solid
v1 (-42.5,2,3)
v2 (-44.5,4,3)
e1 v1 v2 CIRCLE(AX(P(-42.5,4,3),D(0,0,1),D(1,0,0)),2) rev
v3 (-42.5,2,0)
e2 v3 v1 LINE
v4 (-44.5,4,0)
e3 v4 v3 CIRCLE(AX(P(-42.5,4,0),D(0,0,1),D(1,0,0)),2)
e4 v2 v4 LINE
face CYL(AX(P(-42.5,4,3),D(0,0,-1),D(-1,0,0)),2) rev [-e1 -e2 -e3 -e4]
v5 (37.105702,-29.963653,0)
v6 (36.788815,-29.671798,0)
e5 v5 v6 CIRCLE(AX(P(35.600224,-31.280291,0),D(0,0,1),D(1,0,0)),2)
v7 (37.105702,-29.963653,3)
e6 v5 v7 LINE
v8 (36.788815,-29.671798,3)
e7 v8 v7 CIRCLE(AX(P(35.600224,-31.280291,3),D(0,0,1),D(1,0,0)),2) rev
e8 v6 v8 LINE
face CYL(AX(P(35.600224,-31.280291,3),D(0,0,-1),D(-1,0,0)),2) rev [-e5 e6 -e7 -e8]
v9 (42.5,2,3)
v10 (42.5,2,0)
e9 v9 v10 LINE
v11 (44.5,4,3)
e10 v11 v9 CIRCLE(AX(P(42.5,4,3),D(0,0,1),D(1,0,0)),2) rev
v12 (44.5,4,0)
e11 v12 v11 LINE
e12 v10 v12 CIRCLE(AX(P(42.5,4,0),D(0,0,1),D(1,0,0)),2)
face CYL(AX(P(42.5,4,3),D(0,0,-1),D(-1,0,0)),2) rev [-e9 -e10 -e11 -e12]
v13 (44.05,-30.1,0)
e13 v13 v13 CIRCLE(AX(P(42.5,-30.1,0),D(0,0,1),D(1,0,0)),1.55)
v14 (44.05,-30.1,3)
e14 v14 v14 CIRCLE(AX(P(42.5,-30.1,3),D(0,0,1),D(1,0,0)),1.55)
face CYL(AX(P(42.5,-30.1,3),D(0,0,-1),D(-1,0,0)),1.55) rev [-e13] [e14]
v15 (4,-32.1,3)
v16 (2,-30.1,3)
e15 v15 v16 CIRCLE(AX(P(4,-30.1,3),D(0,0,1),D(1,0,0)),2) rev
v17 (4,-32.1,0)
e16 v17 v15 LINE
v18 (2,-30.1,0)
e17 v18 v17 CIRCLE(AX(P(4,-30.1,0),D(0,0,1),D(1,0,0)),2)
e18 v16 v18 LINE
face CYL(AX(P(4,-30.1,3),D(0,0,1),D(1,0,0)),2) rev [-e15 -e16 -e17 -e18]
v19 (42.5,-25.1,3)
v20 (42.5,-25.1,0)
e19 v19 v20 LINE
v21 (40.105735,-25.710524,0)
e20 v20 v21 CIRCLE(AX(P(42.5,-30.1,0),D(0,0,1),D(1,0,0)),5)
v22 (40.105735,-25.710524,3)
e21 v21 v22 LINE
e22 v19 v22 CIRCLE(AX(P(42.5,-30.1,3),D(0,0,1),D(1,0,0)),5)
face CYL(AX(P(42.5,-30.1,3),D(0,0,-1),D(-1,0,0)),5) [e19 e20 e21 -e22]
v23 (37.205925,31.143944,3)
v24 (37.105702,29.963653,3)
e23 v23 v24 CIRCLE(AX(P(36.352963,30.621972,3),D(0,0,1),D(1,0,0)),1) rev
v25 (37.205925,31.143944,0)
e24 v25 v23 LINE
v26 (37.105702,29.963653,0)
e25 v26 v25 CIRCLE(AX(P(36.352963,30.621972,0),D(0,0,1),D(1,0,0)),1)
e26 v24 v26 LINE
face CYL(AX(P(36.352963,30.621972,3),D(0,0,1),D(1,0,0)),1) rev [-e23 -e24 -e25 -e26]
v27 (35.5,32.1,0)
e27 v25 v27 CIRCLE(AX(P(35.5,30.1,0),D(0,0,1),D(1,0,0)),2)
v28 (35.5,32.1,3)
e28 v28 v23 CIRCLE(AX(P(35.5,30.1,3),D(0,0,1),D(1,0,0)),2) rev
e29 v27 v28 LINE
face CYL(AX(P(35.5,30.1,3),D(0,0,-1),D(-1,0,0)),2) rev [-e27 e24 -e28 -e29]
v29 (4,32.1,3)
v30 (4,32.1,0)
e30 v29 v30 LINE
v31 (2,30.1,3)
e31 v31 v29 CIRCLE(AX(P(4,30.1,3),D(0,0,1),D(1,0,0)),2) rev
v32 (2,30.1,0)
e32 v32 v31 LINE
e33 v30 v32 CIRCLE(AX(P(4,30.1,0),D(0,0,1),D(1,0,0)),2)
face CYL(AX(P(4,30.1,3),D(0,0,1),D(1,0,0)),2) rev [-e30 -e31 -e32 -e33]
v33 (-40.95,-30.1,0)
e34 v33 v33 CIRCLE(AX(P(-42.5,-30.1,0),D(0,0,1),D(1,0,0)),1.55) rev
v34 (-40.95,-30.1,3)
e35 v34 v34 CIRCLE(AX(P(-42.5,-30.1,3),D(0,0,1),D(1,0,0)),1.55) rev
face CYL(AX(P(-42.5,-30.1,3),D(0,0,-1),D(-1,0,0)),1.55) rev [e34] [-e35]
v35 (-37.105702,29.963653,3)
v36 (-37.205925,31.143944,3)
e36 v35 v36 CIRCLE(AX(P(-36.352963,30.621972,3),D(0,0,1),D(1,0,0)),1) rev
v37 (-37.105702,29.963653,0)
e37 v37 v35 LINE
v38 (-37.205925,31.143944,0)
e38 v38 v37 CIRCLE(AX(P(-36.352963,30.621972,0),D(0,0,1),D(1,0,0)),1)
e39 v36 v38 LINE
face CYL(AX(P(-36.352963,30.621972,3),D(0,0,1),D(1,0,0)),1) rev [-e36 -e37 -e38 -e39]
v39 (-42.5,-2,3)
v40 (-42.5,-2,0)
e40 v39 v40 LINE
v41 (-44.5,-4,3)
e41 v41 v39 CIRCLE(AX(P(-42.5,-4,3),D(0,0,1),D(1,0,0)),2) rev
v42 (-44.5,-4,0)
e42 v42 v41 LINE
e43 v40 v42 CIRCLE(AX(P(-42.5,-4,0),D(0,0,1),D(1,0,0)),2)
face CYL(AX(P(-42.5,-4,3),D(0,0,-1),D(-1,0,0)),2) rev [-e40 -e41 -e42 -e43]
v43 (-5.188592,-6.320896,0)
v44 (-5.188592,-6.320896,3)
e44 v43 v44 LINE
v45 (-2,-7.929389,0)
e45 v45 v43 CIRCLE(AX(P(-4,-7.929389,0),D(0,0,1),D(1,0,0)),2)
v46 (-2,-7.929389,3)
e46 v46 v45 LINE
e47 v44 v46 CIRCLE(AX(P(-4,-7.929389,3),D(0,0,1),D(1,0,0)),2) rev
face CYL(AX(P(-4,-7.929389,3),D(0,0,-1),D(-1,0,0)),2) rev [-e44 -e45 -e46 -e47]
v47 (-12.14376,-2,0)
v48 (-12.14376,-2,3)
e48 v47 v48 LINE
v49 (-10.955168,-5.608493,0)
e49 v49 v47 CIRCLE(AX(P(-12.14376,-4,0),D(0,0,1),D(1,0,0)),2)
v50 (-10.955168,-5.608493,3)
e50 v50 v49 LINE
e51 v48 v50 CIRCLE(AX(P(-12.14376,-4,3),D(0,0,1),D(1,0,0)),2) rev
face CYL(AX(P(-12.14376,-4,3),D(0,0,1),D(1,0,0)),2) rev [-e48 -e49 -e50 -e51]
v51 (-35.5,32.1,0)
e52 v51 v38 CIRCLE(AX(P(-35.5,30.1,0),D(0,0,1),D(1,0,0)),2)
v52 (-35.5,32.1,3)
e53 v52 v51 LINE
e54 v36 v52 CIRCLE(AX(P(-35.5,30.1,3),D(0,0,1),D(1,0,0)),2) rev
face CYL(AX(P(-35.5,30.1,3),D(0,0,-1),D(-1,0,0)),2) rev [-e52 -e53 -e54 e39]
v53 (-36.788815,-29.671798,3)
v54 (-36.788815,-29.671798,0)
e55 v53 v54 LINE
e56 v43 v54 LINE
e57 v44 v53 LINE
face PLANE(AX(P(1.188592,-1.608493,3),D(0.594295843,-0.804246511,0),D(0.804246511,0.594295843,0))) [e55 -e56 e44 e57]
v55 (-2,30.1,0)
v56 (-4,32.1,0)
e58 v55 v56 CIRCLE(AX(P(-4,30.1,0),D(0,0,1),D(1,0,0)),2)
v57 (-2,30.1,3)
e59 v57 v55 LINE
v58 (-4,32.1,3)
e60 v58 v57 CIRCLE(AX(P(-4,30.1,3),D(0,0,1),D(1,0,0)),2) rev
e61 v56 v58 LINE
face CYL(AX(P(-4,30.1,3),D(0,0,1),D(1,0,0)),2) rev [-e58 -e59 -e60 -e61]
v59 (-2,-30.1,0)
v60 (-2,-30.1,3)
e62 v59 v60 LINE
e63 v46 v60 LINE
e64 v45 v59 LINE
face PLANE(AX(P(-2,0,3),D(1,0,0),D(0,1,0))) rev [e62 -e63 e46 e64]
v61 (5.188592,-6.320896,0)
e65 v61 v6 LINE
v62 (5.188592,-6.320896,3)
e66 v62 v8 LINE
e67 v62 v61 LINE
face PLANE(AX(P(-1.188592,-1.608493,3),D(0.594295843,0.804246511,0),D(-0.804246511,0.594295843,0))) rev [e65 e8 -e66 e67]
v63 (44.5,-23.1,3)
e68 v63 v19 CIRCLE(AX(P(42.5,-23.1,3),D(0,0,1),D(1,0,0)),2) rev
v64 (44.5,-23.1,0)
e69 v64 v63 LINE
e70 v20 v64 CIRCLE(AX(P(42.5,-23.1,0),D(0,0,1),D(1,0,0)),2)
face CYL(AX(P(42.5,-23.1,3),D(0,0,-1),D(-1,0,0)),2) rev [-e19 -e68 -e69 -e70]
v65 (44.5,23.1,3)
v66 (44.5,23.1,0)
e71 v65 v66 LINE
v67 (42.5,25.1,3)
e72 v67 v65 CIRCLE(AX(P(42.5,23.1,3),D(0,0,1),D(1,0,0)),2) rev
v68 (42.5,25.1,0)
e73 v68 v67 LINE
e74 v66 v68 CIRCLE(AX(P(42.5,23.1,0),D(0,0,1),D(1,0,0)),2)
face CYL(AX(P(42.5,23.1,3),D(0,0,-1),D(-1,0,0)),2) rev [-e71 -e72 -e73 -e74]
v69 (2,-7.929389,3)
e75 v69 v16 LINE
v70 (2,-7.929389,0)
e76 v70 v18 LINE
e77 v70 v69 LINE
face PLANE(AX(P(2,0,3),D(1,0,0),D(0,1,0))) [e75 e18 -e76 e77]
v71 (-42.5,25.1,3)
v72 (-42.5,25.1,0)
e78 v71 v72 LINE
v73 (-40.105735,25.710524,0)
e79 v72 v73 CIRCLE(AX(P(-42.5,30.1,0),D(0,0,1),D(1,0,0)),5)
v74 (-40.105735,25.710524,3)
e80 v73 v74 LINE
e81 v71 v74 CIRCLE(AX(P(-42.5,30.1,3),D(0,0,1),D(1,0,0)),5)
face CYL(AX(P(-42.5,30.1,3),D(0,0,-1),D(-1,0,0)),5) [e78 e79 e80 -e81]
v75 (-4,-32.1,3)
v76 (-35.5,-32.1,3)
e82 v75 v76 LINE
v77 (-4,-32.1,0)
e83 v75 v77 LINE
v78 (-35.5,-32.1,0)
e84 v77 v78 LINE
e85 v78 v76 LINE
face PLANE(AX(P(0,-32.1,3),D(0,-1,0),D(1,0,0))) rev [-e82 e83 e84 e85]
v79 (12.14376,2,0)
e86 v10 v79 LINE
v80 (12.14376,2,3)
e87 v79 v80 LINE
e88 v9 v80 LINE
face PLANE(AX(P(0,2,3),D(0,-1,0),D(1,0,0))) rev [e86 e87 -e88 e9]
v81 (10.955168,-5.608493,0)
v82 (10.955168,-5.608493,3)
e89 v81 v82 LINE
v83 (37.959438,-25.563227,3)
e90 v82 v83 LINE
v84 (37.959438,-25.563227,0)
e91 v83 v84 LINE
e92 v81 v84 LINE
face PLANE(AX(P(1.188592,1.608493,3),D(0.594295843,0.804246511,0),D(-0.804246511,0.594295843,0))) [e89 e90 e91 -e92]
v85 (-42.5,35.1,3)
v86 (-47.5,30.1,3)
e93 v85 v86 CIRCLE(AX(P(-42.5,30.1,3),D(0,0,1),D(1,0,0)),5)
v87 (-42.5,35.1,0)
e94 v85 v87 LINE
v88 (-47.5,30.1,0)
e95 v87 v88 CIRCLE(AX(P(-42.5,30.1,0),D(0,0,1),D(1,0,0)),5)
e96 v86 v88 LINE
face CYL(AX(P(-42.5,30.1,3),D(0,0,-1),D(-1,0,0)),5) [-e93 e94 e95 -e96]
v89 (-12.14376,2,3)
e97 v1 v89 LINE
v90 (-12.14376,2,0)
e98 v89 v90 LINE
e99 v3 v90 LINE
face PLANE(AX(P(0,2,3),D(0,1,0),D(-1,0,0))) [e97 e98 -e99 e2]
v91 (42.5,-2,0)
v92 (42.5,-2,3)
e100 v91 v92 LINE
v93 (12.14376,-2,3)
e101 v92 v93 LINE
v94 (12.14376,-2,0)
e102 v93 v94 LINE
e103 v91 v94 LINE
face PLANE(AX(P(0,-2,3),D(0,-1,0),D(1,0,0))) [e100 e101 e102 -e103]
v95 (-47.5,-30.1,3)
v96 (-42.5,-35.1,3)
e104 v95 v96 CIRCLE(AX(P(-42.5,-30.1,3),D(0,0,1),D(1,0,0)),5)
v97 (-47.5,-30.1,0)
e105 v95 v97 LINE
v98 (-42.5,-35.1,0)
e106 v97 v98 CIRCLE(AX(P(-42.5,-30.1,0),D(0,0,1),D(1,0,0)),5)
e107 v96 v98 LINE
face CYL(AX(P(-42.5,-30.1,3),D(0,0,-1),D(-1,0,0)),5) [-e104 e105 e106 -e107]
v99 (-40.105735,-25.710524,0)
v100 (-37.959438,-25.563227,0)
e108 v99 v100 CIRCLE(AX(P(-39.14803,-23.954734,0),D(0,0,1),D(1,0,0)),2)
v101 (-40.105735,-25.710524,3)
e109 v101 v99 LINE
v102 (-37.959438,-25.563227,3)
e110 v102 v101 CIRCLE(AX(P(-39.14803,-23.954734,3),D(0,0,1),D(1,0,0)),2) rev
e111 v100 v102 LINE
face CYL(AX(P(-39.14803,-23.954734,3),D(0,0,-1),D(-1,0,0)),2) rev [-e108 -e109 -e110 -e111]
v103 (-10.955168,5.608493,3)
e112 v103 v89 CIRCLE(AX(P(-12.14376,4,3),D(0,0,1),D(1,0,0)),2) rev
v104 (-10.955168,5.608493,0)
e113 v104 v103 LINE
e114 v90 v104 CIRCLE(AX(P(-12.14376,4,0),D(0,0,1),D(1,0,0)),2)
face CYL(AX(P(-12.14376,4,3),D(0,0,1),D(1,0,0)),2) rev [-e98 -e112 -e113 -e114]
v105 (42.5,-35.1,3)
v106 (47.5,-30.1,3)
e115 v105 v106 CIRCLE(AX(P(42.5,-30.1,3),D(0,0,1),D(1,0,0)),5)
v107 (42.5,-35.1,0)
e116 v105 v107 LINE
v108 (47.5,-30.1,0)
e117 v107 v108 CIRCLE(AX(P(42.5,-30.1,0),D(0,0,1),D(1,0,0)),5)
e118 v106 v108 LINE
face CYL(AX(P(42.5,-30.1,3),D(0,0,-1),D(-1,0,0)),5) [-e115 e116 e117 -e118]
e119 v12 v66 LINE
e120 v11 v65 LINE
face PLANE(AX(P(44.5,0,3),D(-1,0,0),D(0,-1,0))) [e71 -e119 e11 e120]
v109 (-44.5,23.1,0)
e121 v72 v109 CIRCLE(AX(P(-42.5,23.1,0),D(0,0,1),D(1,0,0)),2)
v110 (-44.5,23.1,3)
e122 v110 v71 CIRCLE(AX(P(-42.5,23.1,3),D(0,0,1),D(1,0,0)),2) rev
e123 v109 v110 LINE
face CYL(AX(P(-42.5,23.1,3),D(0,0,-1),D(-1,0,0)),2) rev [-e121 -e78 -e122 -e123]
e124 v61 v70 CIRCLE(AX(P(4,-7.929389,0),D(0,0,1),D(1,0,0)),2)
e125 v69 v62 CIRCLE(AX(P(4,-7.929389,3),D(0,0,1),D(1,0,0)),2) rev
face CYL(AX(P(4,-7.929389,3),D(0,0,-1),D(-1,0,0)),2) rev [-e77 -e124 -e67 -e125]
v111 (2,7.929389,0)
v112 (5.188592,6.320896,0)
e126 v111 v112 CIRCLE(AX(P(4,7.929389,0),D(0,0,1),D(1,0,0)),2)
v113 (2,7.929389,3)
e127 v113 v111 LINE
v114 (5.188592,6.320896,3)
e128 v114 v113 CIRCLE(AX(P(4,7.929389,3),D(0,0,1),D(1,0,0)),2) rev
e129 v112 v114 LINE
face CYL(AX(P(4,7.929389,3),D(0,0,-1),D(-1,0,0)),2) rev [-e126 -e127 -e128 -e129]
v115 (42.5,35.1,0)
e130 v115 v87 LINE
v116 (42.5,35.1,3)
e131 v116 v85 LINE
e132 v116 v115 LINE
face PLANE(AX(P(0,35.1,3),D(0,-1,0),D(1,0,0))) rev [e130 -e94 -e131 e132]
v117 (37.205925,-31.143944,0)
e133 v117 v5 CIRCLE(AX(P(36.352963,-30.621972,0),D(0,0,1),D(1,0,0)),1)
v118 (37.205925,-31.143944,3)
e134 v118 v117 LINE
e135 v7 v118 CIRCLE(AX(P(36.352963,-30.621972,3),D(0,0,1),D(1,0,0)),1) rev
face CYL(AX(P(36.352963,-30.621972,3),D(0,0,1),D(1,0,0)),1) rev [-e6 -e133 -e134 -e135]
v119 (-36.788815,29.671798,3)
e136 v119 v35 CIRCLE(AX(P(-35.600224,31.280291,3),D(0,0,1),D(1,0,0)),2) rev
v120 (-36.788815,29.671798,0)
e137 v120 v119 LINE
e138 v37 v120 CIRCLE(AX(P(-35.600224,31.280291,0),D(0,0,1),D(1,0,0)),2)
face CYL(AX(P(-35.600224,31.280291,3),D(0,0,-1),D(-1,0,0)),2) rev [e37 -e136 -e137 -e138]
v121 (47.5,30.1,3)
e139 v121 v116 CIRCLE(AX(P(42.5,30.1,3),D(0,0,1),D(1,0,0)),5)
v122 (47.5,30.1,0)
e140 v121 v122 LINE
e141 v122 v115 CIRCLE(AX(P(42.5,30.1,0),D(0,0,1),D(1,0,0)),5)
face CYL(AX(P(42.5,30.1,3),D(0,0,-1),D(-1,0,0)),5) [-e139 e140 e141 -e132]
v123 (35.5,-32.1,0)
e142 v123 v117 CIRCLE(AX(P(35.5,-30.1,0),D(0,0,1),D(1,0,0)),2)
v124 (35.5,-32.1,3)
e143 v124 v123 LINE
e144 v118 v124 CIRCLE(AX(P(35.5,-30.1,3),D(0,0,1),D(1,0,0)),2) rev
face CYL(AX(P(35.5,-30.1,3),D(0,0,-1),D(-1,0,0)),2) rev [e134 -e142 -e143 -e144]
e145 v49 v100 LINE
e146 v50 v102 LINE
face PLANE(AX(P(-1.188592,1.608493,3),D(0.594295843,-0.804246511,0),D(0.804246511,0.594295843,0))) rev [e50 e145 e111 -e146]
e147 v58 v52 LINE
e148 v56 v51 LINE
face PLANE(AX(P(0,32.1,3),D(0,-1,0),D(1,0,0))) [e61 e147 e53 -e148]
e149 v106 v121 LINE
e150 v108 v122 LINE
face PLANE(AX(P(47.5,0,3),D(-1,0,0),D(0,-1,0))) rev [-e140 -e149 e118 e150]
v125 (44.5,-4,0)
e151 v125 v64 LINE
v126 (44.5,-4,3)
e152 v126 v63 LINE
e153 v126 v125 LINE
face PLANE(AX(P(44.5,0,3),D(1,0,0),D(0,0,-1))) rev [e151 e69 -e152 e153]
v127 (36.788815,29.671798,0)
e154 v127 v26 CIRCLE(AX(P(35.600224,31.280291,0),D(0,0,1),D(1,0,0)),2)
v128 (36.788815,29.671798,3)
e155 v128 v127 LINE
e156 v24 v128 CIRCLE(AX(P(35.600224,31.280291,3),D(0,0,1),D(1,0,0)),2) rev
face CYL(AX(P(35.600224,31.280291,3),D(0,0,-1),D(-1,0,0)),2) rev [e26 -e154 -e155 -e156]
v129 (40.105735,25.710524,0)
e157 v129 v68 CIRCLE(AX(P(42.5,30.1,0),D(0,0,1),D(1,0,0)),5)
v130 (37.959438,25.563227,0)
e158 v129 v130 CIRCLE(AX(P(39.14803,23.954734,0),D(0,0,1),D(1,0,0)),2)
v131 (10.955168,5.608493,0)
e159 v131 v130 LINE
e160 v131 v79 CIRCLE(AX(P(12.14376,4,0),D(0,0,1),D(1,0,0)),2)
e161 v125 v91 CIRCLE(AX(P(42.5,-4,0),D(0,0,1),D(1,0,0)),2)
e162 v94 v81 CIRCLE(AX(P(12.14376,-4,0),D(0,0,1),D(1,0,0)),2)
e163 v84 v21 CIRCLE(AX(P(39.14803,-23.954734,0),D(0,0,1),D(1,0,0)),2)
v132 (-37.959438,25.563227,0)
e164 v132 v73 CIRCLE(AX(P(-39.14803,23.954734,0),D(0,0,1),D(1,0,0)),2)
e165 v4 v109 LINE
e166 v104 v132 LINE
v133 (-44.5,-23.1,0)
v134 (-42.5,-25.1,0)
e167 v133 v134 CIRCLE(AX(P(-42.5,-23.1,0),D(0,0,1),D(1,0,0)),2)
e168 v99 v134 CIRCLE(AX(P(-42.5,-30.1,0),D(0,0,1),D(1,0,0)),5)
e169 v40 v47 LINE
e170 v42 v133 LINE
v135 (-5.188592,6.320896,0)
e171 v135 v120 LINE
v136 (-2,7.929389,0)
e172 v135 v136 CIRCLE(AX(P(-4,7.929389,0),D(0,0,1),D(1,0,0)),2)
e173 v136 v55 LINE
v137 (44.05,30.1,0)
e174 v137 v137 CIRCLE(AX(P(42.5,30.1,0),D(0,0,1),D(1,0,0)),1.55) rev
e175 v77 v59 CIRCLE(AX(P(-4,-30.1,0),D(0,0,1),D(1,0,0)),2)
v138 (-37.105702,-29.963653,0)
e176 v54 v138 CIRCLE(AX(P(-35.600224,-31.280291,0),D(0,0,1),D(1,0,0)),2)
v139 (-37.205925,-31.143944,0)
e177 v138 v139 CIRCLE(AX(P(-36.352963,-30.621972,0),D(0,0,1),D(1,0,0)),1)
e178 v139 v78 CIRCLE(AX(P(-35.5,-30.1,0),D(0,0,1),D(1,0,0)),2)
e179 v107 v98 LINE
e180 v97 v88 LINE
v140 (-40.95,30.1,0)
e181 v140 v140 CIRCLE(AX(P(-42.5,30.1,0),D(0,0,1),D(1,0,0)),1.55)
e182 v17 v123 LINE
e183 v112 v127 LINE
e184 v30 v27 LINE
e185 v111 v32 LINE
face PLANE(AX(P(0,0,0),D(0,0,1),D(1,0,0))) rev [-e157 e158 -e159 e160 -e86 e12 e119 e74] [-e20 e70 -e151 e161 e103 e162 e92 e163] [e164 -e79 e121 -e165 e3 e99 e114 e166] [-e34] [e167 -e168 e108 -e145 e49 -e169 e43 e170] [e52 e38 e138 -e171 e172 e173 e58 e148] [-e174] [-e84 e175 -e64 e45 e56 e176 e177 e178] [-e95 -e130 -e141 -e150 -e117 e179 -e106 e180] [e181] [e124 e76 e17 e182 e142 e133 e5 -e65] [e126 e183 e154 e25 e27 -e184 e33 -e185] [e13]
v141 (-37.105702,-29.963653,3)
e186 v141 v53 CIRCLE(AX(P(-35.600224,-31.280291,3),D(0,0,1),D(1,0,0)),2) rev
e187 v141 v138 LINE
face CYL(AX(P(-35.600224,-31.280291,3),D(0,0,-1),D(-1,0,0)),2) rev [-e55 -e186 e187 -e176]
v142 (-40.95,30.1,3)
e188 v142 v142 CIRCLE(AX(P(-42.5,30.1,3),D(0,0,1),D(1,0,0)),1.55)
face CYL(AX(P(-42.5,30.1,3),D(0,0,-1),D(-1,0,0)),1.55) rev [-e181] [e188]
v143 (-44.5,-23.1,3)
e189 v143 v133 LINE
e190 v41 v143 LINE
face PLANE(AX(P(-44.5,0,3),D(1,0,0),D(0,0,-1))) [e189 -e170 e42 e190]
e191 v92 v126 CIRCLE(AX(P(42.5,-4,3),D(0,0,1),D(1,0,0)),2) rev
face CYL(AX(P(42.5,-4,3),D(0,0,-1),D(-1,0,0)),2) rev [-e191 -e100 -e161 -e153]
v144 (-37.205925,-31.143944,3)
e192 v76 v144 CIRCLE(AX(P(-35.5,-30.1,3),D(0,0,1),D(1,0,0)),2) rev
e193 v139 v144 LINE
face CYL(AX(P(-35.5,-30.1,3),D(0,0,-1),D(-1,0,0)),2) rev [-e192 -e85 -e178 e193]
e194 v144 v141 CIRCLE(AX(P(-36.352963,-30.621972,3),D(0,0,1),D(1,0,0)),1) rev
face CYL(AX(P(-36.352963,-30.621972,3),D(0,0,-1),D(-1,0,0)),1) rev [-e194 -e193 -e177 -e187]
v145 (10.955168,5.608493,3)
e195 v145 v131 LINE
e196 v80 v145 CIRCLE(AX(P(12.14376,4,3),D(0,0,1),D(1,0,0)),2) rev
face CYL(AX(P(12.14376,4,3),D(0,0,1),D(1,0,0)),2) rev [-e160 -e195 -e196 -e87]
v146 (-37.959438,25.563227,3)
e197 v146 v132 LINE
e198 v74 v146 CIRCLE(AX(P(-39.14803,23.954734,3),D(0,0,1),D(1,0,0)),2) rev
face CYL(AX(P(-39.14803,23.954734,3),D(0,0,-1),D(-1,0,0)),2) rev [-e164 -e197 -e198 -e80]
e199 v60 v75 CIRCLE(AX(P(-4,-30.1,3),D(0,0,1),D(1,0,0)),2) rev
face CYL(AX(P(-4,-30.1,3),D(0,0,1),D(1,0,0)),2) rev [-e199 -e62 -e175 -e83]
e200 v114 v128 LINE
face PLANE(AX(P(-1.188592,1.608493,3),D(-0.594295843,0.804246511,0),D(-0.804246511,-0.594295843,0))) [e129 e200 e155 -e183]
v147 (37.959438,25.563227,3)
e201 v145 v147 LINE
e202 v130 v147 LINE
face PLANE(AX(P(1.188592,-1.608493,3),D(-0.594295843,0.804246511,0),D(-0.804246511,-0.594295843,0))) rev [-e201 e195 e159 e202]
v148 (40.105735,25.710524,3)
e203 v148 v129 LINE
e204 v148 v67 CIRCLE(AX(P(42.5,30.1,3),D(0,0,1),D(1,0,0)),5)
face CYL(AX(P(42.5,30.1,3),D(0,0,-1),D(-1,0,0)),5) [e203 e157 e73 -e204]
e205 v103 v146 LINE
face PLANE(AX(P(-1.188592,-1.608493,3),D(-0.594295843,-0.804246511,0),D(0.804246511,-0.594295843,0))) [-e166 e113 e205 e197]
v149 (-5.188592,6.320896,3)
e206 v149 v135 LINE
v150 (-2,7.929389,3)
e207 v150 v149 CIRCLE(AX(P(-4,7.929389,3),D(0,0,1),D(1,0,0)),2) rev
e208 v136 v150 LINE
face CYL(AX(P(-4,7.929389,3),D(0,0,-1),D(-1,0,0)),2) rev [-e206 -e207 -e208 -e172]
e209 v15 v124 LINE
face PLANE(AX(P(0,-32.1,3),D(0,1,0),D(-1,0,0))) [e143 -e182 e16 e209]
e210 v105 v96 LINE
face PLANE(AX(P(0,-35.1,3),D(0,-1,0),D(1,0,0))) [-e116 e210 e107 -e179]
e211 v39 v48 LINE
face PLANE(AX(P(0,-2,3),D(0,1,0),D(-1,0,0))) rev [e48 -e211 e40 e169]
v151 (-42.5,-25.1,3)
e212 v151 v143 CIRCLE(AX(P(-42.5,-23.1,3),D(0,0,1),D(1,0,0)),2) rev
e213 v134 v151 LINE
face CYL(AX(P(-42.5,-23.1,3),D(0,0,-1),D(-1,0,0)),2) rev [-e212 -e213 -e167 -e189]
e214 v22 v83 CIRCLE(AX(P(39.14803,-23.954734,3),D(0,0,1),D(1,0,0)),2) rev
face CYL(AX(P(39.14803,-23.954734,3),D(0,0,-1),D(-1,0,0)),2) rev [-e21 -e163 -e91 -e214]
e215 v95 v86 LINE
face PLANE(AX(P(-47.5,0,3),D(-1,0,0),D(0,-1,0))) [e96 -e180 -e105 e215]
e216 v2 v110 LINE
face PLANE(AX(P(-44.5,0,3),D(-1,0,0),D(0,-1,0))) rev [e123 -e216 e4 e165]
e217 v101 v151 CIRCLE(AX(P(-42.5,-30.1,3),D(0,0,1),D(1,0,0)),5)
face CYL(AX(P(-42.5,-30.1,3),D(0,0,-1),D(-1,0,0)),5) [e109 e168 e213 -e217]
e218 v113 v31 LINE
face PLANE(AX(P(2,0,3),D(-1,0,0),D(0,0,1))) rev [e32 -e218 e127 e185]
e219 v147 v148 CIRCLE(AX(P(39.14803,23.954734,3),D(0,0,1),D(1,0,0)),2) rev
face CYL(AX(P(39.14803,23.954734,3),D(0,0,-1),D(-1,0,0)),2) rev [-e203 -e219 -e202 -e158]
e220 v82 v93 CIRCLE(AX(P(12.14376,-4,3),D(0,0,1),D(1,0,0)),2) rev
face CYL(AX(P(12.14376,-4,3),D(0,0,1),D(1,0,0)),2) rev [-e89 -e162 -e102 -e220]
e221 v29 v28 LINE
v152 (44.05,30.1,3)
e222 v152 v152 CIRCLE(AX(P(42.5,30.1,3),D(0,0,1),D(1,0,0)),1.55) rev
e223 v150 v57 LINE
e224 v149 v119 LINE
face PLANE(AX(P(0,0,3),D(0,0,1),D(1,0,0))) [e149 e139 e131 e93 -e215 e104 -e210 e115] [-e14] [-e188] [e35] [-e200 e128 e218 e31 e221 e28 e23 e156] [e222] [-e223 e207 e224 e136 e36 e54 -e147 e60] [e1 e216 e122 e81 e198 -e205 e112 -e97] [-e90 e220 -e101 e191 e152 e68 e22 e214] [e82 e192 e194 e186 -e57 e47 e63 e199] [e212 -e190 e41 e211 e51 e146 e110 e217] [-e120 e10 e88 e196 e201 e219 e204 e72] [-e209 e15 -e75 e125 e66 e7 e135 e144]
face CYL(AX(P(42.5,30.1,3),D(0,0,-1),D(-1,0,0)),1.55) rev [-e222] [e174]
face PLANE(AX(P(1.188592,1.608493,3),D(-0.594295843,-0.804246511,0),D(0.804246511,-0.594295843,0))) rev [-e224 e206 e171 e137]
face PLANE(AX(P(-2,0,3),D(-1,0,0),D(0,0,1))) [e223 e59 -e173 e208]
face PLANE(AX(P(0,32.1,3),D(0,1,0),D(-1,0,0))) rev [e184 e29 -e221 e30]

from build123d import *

# Parameters (mm, degrees)
SKETCH_1_R      = 5
SKETCH_1_R_2    = 1.55
EXTRUDE_1_DEPTH = 3
FILLET_1_R      = 2
FILLET_2_R      = 1


with BuildPart() as part:
    # 草图1 → 凸台-拉伸1 (new body)
    # profile 1 of 5: a face of its own
    with BuildSketch(Plane.XY):
        with BuildLine():
            Line((-42.5, -35.1), (42.5, -35.1))
            ThreePointArc((42.5, -35.1), (39.761387212, -34.283300133), (37.917424305, -32.1))
            Line((37.917424305, -32.1), (2, -32.1))
            Line((2, -32.1), (2, -3.964694458))
            Line((2, -3.964694458), (37.500961204, -30.198036316))
            ThreePointArc((37.500961204, -30.198036316), (37.902514018, -28.134517198), (39.116783888, -26.418444794))
            Line((39.116783888, -26.418444794), (6.071879965, -2))
            Line((6.071879965, -2), (44.5, -2))
            Line((44.5, -2), (44.5, -25.517424305))
            ThreePointArc((44.5, -25.517424305), (46.683300133, -27.361387212), (47.5, -30.1))
            Line((47.5, -30.1), (47.5, 30.1))
            ThreePointArc((47.5, 30.1), (46.683300133, 27.361387212), (44.5, 25.517424305))
            Line((44.5, 25.517424305), (44.5, 2))
            Line((44.5, 2), (6.071879965, 2))
            Line((6.071879965, 2), (39.116783888, 26.418444794))
            ThreePointArc((39.116783888, 26.418444794), (37.902514018, 28.134517198), (37.500961204, 30.198036316))
            Line((37.500961204, 30.198036316), (2, 3.964694458))
            Line((2, 3.964694458), (2, 32.1))
            Line((2, 32.1), (37.917424305, 32.1))
            ThreePointArc((37.917424305, 32.1), (39.761387212, 34.283300133), (42.5, 35.1))
            Line((42.5, 35.1), (-42.5, 35.1))
            ThreePointArc((-42.5, 35.1), (-39.761387212, 34.283300133), (-37.917424305, 32.1))
            Line((-37.917424305, 32.1), (-2, 32.1))
            Line((-2, 32.1), (-2, 3.964694458))
            Line((-2, 3.964694458), (-37.500961204, 30.198036316))
            ThreePointArc((-37.500961204, 30.198036316), (-37.500240307, 30.149020514), (-37.5, 30.1))
            ThreePointArc((-37.5, 30.1), (-37.922004775, 28.089537437), (-39.116783888, 26.418444794))
            Line((-39.116783888, 26.418444794), (-6.071879965, 2))
            Line((-6.071879965, 2), (-44.5, 2))
            Line((-44.5, 2), (-44.5, 25.517424305))
            ThreePointArc((-44.5, 25.517424305), (-46.683300133, 27.361387212), (-47.5, 30.1))
            Line((-47.5, 30.1), (-47.5, -30.1))
            ThreePointArc((-47.5, -30.1), (-46.683300133, -27.361387212), (-44.5, -25.517424305))
            Line((-44.5, -25.517424305), (-44.5, -2))
            Line((-44.5, -2), (-6.071879965, -2))
            Line((-6.071879965, -2), (-39.116783888, -26.418444794))
            ThreePointArc((-39.116783888, -26.418444794), (-37.922004775, -28.089537437), (-37.5, -30.1))
            ThreePointArc((-37.5, -30.1), (-37.500240307, -30.149020514), (-37.500961204, -30.198036316))
            Line((-37.500961204, -30.198036316), (-2, -3.964694458))
            Line((-2, -3.964694458), (-2, -32.1))
            Line((-2, -32.1), (-37.917424305, -32.1))
            ThreePointArc((-37.917424305, -32.1), (-39.761387212, -34.283300133), (-42.5, -35.1))
        make_face()
    # profile 2 of 5: a face of its own
    with BuildSketch(Plane.XY):
        with Locations((-42.5, 30.1)):
            Circle(SKETCH_1_R)
        with Locations((-42.5, 30.1)):
            Circle(SKETCH_1_R_2, mode=Mode.SUBTRACT)
    # profile 3 of 5: a face of its own
    with BuildSketch(Plane.XY):
        with Locations((42.5, 30.1)):
            Circle(SKETCH_1_R)
        with Locations((42.5, 30.1)):
            Circle(SKETCH_1_R_2, mode=Mode.SUBTRACT)
    # profile 4 of 5: a face of its own
    with BuildSketch(Plane.XY):
        with Locations((42.5, -30.1)):
            Circle(SKETCH_1_R)
        with Locations((42.5, -30.1)):
            Circle(SKETCH_1_R_2, mode=Mode.SUBTRACT)
    # profile 5 of 5: a face of its own
    with BuildSketch(Plane.XY):
        with Locations((-42.5, -30.1)):
            Circle(SKETCH_1_R)
        with Locations((-42.5, -30.1)):
            Circle(SKETCH_1_R_2, mode=Mode.SUBTRACT)
    extrude(amount=EXTRUDE_1_DEPTH)

    # 圆角1
    # the kernel refuses this fillet: 2 mm, written as the material it adds along each edge
    with BuildSketch(Plane(origin=(39.116783888, 26.418444794, 0), x_dir=(-0.8042465112804378, -0.5942958430724927, 0), z_dir=(0, 0, 1)), Plane(origin=(-39.116783888, -26.418444794, 0), x_dir=(0.8042465112804382, 0.5942958430724918, 0), z_dir=(0, 0, 1))) as fillet_1_piece_1:
        with BuildLine():
            CenterArc((1.439043849, 2), FILLET_1_R, 204.927038376, 65.072961624)
            ThreePointArc((-0.374646596, 1.157072383), (-0.152011037, 0.589969891), (0, 0))
            Line((0, 0), (1.439043849, 0))
        make_face()
    extrude(amount=3)
    with BuildSketch(Plane(origin=(6.071879965, 2, 0), x_dir=(1, 0, 0), z_dir=(0, 0, 1)), Plane(origin=(6.071879965, -2, 0), x_dir=(0.804246511280438, -0.5942958430724921, 0), z_dir=(0, 0, 1)), Plane(origin=(-6.071879965, -2, 0), x_dir=(-1, 0, 0), z_dir=(0, 0, 1)), Plane(origin=(-6.071879965, 2, 0), x_dir=(-0.8042465112804379, 0.5942958430724924, 0), z_dir=(0, 0, 1))) as fillet_1_piece_2:
        with BuildLine():
            CenterArc((FILLET_1_R * 3.03593998227, FILLET_1_R), FILLET_1_R, 126.462450613, 143.537549387)
            Line((FILLET_1_R * 2.4416441392, FILLET_1_R * 1.80424651128), (0, 0))
            Line((0, 0), (FILLET_1_R * 3.03593998227, 0))
        make_face()
    extrude(amount=3)
    with BuildSketch(Plane(origin=(44.5, 2, 0), x_dir=(0, 1, 0), z_dir=(0, 0, 1)), Plane(origin=(44.5, -2, 0), x_dir=(-1, 0, 0), z_dir=(0, 0, 1)), Plane(origin=(2, -32.1, 0), x_dir=(1, 0, 0), z_dir=(0, 0, 1)), Plane(origin=(-2, -32.1, 0), x_dir=(0, 1, 0), z_dir=(0, 0, 1)), Plane(origin=(-44.5, -2, 0), x_dir=(0, -1, 0), z_dir=(0, 0, 1)), Plane(origin=(-44.5, 2, 0), x_dir=(1, 0, 0), z_dir=(0, 0, 1)), Plane(origin=(-2, 32.1, 0), x_dir=(-1, 0, 0), z_dir=(0, 0, 1)), Plane(origin=(2, 32.1, 0), x_dir=(0, -1, 0), z_dir=(0, 0, 1))) as fillet_1_piece_3:
        with BuildLine():
            CenterArc((FILLET_1_R, FILLET_1_R), FILLET_1_R, 180, 90)
            Line((0, FILLET_1_R), (0, 0))
            Line((0, 0), (FILLET_1_R, 0))
        make_face()
    extrude(amount=3)
    with BuildSketch(Plane(origin=(44.5, 25.517424305, 0), x_dir=(0, -1, 0), z_dir=(0, 0, 1)), Plane(origin=(37.917424305, -32.1, 0), x_dir=(-1, 0, 0), z_dir=(0, 0, 1)), Plane(origin=(-44.5, -25.517424305, 0), x_dir=(0, 1, 0), z_dir=(0, 0, 1)), Plane(origin=(-37.917424305, 32.1, 0), x_dir=(1, 0, 0), z_dir=(0, 0, 1))) as fillet_1_piece_4:
        with BuildLine():
            CenterArc((2.417424305, -2), FILLET_1_R, 90, 90)
            ThreePointArc((0.417424305, -2), (0.31195587, -0.978451782), (0, 0))
            Line((0, 0), (2.417424305, 0))
        make_face()
    extrude(amount=3)
    with BuildSketch(Plane(origin=(44.5, -25.517424305, 0), x_dir=(0, 1, 0), z_dir=(0, 0, 1)), Plane(origin=(-37.917424305, -32.1, 0), x_dir=(1, 0, 0), z_dir=(0, 0, 1)), Plane(origin=(-44.5, 25.517424305, 0), x_dir=(0, -1, 0), z_dir=(0, 0, 1)), Plane(origin=(37.917424305, 32.1, 0), x_dir=(-1, 0, 0), z_dir=(0, 0, 1))) as fillet_1_piece_5:
        with BuildLine():
            CenterArc((2.417424305, 2), FILLET_1_R, 180, 90)
            ThreePointArc((0.417424305, 2), (0.31195587, 0.978451782), (0, 0))
            Line((0, 0), (2.417424305, 0))
        make_face()
    extrude(amount=3)
    with BuildSketch(Plane(origin=(39.116783888, -26.418444794, 0), x_dir=(-0.8042465112804377, 0.5942958430724928, 0), z_dir=(0, 0, 1)), Plane(origin=(-39.116783888, 26.418444794, 0), x_dir=(0.8042465112804396, -0.5942958430724902, 0), z_dir=(0, 0, 1))) as fillet_1_piece_6:
        with BuildLine():
            CenterArc((1.439043849, -2), FILLET_1_R, 90, 65.072961624)
            ThreePointArc((-0.374646596, -1.157072383), (-0.152011037, -0.589969891), (0, 0))
            Line((0, 0), (1.439043849, 0))
        make_face()
    extrude(amount=3)
    with BuildSketch(Plane(origin=(2, -3.964694458, 0), x_dir=(0, -1, 0), z_dir=(0, 0, 1)), Plane(origin=(-2, -3.964694458, 0), x_dir=(-0.8042465112804379, -0.5942958430724925, 0), z_dir=(0, 0, 1)), Plane(origin=(-2, 3.964694458, 0), x_dir=(0, 1, 0), z_dir=(0, 0, 1)), Plane(origin=(2, 3.964694458, 0), x_dir=(0.804246511280438, 0.5942958430724923, 0), z_dir=(0, 0, 1))) as fillet_1_piece_7:
        with BuildLine():
            CenterArc((FILLET_1_R * 1.982347229, FILLET_1_R), FILLET_1_R, 143.537549387, 126.462450613)
            Line((FILLET_1_R * 1.17810071772, FILLET_1_R * 1.59429584307), (0, 0))
            Line((0, 0), (FILLET_1_R * 1.982347229, 0))
        make_face()
    extrude(amount=3)
    with BuildSketch(Plane(origin=(37.500961204, -30.198036316, 0), x_dir=(-0.8042465112804396, 0.5942958430724902, 0), z_dir=(0, 0, 1)), Plane(origin=(-37.500961204, 30.198036316, 0), x_dir=(0.8042465112804383, -0.5942958430724916, 0), z_dir=(0, 0, 1))) as fillet_1_piece_8:
        with BuildLine():
            CenterArc((0.885482013, 2), FILLET_1_R, 226.169636842, 43.830363158)
            ThreePointArc((-0.499569115, 0.557213331), (-0.239344892, 0.287966338), (0, 0))
            Line((0, 0), (0.885482013, 0))
        make_face()
    extrude(amount=3)
    with BuildSketch(Plane(origin=(-37.500961204, -30.198036316, 0), x_dir=(0.8042465112804397, 0.59429584307249, 0), z_dir=(0, 0, 1)), Plane(origin=(37.500961204, 30.198036316, 0), x_dir=(-0.8042465112804407, -0.5942958430724886, 0), z_dir=(0, 0, 1))) as fillet_1_piece_9:
        with BuildLine():
            CenterArc((0.885482013, -2), FILLET_1_R, 90, 43.830363158)
            ThreePointArc((-0.499569115, -0.557213331), (-0.239344892, -0.287966338), (0, 0))
            Line((0, 0), (0.885482013, 0))
        make_face()
    extrude(amount=3)

    # 圆角2
    fillet_2_edges = [part.edges().sort_by_distance(p)[0] for p in [
        (37.453554234, -30.528515876, 1.5),
        (-37.453554234, -30.528515876, 1.5),
        (-37.453554234, 30.528515876, 1.5),
        (37.453554234, 30.528515876, 1.5),
    ]]
    fillet(fillet_2_edges, radius=FILLET_2_R)


solid = part.part
